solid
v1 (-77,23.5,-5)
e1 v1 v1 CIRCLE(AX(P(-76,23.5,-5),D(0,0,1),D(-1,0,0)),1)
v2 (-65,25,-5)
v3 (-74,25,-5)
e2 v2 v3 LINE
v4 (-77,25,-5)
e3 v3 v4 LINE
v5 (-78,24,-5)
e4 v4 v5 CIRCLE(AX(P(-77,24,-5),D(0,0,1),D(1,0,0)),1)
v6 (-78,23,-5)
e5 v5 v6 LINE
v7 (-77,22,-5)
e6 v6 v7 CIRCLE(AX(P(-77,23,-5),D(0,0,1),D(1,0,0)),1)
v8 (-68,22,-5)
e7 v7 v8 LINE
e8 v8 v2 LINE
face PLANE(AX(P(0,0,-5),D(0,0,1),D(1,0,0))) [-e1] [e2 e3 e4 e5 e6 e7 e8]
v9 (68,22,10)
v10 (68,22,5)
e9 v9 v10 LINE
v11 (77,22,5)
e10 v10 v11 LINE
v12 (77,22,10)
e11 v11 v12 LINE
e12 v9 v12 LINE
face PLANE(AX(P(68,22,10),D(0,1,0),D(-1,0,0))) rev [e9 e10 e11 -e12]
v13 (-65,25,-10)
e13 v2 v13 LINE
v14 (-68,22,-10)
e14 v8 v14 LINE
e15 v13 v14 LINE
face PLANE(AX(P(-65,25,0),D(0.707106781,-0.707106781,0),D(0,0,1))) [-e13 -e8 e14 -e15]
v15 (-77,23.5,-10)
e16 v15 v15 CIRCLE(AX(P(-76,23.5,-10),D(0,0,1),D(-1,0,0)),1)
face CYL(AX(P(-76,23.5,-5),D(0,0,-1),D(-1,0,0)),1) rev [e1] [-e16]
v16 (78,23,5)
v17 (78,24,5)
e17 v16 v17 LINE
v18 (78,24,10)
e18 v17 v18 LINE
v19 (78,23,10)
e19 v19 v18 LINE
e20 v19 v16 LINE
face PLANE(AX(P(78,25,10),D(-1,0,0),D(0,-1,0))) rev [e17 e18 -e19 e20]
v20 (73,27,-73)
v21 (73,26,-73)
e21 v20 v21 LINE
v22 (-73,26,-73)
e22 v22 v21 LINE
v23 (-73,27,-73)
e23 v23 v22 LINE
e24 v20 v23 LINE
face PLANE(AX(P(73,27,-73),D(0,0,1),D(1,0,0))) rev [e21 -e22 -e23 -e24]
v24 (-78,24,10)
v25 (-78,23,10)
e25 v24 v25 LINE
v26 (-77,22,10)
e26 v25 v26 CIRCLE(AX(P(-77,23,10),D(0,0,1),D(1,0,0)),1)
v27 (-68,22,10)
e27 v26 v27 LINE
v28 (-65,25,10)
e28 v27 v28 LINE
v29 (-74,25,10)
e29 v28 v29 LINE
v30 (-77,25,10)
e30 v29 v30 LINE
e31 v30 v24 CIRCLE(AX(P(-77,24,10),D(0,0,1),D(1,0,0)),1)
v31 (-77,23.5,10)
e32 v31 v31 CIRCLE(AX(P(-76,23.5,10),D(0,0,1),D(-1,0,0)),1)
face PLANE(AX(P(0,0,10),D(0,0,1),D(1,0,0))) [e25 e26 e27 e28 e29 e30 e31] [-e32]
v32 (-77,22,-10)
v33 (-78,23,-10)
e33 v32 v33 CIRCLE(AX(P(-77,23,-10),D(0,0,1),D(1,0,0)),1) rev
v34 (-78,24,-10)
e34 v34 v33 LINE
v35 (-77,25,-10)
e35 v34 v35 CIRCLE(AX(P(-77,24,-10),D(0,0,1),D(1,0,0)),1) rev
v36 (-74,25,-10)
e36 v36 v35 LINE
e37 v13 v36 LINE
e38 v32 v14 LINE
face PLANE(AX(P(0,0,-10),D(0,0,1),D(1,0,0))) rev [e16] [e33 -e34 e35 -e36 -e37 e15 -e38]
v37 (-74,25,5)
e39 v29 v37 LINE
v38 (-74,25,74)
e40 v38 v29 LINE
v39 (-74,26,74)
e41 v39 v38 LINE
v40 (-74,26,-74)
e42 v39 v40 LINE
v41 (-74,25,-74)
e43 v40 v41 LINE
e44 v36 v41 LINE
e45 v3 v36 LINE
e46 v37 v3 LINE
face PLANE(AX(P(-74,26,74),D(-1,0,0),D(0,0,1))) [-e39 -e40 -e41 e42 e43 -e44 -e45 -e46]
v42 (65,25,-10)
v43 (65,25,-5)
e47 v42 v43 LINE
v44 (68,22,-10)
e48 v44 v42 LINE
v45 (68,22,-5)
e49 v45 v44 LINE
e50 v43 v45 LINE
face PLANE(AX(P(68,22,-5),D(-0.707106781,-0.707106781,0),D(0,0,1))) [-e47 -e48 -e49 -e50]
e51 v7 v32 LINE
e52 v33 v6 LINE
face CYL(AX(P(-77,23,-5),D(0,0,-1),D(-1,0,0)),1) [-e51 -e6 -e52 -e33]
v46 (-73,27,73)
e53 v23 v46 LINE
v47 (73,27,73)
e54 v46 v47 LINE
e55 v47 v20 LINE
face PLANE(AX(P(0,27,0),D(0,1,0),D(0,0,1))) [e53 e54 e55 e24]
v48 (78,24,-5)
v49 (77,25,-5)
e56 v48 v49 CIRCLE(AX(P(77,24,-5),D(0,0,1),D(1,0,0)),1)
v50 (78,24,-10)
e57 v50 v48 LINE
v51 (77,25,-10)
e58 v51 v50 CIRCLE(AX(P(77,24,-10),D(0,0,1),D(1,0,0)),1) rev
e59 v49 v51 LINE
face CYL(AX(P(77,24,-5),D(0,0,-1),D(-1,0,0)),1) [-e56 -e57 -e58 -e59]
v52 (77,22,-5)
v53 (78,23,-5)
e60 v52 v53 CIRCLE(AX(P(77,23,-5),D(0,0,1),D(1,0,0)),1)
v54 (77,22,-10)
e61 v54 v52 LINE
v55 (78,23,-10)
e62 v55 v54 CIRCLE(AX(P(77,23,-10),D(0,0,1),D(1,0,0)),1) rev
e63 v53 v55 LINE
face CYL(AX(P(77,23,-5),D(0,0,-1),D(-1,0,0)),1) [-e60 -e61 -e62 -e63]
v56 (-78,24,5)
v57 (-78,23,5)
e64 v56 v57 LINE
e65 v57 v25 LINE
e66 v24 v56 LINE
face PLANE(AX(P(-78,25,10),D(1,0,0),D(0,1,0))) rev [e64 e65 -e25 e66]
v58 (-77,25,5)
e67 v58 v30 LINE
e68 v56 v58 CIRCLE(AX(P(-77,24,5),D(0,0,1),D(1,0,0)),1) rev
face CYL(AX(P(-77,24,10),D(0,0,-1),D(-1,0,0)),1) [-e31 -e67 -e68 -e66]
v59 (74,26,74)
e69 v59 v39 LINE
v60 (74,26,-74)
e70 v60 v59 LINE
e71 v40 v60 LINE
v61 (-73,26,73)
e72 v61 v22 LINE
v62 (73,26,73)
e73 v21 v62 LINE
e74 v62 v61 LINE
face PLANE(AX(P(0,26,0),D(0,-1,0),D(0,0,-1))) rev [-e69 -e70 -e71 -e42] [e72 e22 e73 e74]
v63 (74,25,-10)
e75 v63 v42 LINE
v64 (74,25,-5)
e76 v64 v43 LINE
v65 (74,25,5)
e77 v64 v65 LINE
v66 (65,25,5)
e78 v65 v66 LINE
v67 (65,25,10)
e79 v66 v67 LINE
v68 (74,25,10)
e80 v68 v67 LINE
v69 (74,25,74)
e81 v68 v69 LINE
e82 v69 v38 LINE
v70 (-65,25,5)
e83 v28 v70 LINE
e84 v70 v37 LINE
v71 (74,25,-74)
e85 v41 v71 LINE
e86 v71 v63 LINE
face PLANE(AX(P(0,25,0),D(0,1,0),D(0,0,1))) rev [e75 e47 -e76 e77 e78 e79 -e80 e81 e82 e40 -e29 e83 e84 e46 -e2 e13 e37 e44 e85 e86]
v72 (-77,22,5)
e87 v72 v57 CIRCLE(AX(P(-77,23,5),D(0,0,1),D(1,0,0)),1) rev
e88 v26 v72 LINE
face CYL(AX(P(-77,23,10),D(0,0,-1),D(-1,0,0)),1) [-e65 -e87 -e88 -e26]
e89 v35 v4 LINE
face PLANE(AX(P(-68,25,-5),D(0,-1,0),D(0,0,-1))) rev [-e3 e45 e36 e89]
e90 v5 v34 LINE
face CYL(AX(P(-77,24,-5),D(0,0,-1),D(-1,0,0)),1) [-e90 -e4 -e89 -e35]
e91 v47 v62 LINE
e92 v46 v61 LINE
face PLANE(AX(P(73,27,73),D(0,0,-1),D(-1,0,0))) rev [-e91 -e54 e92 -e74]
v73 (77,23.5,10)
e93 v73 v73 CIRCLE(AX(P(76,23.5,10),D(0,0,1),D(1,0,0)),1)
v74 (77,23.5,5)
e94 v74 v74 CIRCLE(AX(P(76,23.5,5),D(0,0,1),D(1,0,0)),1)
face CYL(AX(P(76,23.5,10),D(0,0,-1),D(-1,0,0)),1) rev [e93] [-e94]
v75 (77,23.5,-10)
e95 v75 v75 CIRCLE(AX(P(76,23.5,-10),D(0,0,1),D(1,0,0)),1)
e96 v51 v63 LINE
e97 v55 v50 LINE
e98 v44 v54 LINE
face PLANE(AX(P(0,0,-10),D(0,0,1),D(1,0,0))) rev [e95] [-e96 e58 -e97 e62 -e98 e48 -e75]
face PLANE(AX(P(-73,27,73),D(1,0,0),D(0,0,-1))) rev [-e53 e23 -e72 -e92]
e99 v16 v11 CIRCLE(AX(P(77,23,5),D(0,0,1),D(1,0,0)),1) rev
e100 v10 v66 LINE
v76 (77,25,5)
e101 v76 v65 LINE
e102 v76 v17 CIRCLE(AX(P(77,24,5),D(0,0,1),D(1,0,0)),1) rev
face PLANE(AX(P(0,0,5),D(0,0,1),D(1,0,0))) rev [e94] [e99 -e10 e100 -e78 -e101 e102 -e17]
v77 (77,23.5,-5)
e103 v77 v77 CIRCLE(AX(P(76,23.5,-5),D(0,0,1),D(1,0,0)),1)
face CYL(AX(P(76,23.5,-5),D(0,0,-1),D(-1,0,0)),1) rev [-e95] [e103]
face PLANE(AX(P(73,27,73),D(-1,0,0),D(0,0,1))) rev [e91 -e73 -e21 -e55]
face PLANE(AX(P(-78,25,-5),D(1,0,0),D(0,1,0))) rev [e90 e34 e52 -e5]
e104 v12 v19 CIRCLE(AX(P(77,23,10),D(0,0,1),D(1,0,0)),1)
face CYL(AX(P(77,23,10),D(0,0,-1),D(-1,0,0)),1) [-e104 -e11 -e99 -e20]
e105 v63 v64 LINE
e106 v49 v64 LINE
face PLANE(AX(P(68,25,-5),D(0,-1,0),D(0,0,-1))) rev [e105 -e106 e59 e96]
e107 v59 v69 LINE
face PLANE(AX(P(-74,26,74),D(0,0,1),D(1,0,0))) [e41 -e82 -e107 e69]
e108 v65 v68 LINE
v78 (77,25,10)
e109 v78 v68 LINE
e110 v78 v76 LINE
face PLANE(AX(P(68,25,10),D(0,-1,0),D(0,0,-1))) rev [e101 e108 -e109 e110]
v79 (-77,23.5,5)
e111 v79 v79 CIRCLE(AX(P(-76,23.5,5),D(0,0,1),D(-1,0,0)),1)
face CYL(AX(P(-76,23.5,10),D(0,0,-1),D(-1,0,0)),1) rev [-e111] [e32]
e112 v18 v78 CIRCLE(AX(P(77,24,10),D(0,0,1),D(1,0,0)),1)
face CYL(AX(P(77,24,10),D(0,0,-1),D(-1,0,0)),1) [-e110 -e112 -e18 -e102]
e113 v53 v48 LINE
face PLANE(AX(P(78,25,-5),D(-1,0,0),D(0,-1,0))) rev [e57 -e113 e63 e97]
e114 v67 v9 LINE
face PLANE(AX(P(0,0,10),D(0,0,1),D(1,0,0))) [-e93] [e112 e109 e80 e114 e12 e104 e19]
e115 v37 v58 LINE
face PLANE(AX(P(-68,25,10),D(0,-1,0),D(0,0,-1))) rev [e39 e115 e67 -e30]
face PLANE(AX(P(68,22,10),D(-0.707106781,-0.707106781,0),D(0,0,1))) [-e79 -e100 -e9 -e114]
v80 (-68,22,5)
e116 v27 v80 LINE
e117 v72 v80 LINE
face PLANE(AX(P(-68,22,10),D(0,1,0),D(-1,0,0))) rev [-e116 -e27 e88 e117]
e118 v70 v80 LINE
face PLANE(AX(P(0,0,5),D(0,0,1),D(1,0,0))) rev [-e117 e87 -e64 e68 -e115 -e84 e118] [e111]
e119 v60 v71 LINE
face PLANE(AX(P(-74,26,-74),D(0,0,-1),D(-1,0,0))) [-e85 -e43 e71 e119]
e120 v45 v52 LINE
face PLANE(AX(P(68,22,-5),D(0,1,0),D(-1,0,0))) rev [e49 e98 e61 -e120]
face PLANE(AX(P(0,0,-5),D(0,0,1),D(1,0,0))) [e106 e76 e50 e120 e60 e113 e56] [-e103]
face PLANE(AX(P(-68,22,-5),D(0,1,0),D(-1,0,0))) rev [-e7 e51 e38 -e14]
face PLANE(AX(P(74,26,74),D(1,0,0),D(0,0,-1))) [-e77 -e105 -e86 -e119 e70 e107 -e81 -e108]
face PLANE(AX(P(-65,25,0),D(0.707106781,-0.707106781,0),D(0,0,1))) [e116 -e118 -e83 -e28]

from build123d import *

# Parameters (mm, degrees)
SKETCH1_R           = 10
SKETCH1_R_2         = 7.5
BOSS_EXTRUDE1_DEPTH = 25
THREAD1_PITCH       = 0.3175
SKETCH4_W           = 146
SKETCH4_H           = 146
BOSS_EXTRUDE2_DEPTH = 2
SKETCH5_W           = 148
SKETCH5_H           = 148
BOSS_EXTRUDE3_DEPTH = 1
BOSS_EXTRUDE4_START = 7.5
SKETCH6_W           = 10
SKETCH6_H           = 3
SKETCH6_R           = 1
BOSS_EXTRUDE4_DEPTH = 2.5
BOSS_EXTRUDE5_START = -7.5
SKETCH6_2_W         = 10
SKETCH6_2_H         = 3
SKETCH6_2_R         = 1
BOSS_EXTRUDE5_DEPTH = 2.5
SKETCH9_R           = 18.995637602
CUT_EXTRUDE1_DEPTH  = 111.385687501
CHAMFER1_SIZE       = 3
FILLET1_R           = 1


with BuildPart() as part:
    # Sketch1 → Boss-Extrude1 (new body)
    with BuildSketch(Plane(origin=(0, 0, 0), x_dir=(1, 0, 0), z_dir=(0, 1, 0))):
        with Locations(Location((0, 0, 0), (0, 0, 270))):
            Circle(SKETCH1_R)
        with Locations(Location((0, 0, 0), (0, 0, 270))):
            Circle(SKETCH1_R_2, mode=Mode.SUBTRACT)
    extrude(amount=BOSS_EXTRUDE1_DEPTH)

    # Thread1: the profile of Thread Profile1 profile screwed along a right-hand helix of 18.897638 turns, 6 arcs to a turn; built about Z, then put on its axis
    thread1_z = Axis((0, 0, 0), (0, 0, 1))
    thread1_corners = [(10.0003, 0, -0.000173205), (10.0003, 0, 0.277985704), (9.828148085, 0, 0.17859375), (9.828148085, 0, 0.09921875)]
    with BuildLine(mode=Mode.PRIVATE) as thread1_profile:
        Line(thread1_corners[0], thread1_corners[1])
        Line(thread1_corners[1], thread1_corners[2])
        Line(thread1_corners[2], thread1_corners[3])
        Line(thread1_corners[3], thread1_corners[0])
    thread1_cap = Face(thread1_profile.wire())
    thread1_turn_angles = [0, 30, 60, 90, 120, 150, 180, 210, 240, 270, 300, 330, 360]
    thread1_turn_weights = [1, 0.8660254037844387, 1, 0.8660254037844387, 1, 0.8660254037844387, 1, 0.8660254037844387, 1, 0.8660254037844387, 1, 0.8660254037844387, 1]
    thread1_turn_rails = [Edge.make_bspline([Vector(p[0], p[1], 0).rotate(thread1_z, thread1_turn_angles[k]) / thread1_turn_weights[k] + Vector(0, 0, p[2] + THREAD1_PITCH * thread1_turn_angles[k] / 360) for k in range(13)], [0, 0, 0, 1, 1, 2, 2, 3, 3, 4, 4, 5, 5, 6, 6, 6], 2, thread1_turn_weights) for p in thread1_corners]
    thread1_turn_sides = [Face.make_surface_from_curves(thread1_turn_rails[p[0]], thread1_turn_rails[p[1]]) for p in [(0, 1), (1, 2), (2, 3), (3, 0)]]
    thread1_last_angles = [6480, 6510, 6540, 6570, 6600, 6630, 6660, 6690, 6720, 6750, 6780, 6791.57480315, 6803.149606299]
    thread1_last_weights = [1, 0.8660254037844387, 1, 0.8660254037844387, 1, 0.8660254037844387, 1, 0.8660254037844387, 1, 0.8660254037844387, 1, 0.9796635825089068, 1]
    thread1_last_rails = [Edge.make_bspline([Vector(p[0], p[1], 0).rotate(thread1_z, thread1_last_angles[k]) / thread1_last_weights[k] + Vector(0, 0, p[2] + THREAD1_PITCH * thread1_last_angles[k] / 360) for k in range(13)], [0, 0, 0, 1, 1, 2, 2, 3, 3, 4, 4, 5, 5, 6, 6, 6], 2, thread1_last_weights) for p in thread1_corners]
    thread1_last_sides = [Face.make_surface_from_curves(thread1_last_rails[p[0]], thread1_last_rails[p[1]]) for p in [(0, 1), (1, 2), (2, 3), (3, 0)]]
    thread1 = Plane(origin=(0, -0.5, 0), x_dir=(1, 0, 0), z_dir=(0, 1, 0)) * Solid(Shell([*[p.moved(Location((0, 0, THREAD1_PITCH * i))) for i in range(18) for p in thread1_turn_sides], *thread1_last_sides, thread1_cap, thread1_cap.rotate(thread1_z, 6803.149606299).moved(Location((0, 0, THREAD1_PITCH * 6803.149606299 / 360)))]))
    add(thread1, mode=Mode.SUBTRACT)

    # Sketch4 → Boss-Extrude2 (add)
    with BuildSketch(Plane(origin=(0, 25, 0), x_dir=(1, 0, 0), z_dir=(0, 1, 0))):
        Rectangle(SKETCH4_W, SKETCH4_H)
    extrude(amount=BOSS_EXTRUDE2_DEPTH)

    # Sketch5 → Boss-Extrude3 (add)
    with BuildSketch(Plane.XZ.offset(-25)):
        Rectangle(SKETCH5_W, SKETCH5_H)
    extrude(amount=-BOSS_EXTRUDE3_DEPTH)

    # Sketch6 → Boss-Extrude4 (add, symmetric)
    # profile 1 of 2: a face of its own
    with BuildSketch(Plane.XY.offset(BOSS_EXTRUDE4_START)):
        with Locations((73, 23.5)):
            Rectangle(SKETCH6_W, SKETCH6_H)
        with Locations((76, 23.5)):
            Circle(SKETCH6_R, mode=Mode.SUBTRACT)
    # profile 2 of 2: a face of its own
    with BuildSketch(Plane.XY.offset(BOSS_EXTRUDE4_START)):
        with Locations((-73, 23.5)):
            Rectangle(SKETCH6_W, SKETCH6_H)
        with Locations(Location((-76, 23.5, 0), (0, 0, 180))):
            Circle(SKETCH6_R, mode=Mode.SUBTRACT)
    extrude(amount=BOSS_EXTRUDE4_DEPTH, both=True)

    # Sketch6<2> → Boss-Extrude5 (add, symmetric)
    # profile 1 of 2: a face of its own
    with BuildSketch(Plane.XY.offset(BOSS_EXTRUDE5_START)):
        with Locations((73, 23.5)):
            Rectangle(SKETCH6_2_W, SKETCH6_2_H)
        with Locations((76, 23.5)):
            Circle(SKETCH6_2_R, mode=Mode.SUBTRACT)
    # profile 2 of 2: a face of its own
    with BuildSketch(Plane.XY.offset(BOSS_EXTRUDE5_START)):
        with Locations((-73, 23.5)):
            Rectangle(SKETCH6_2_W, SKETCH6_2_H)
        with Locations(Location((-76, 23.5, 0), (0, 0, 180))):
            Circle(SKETCH6_2_R, mode=Mode.SUBTRACT)
    extrude(amount=BOSS_EXTRUDE5_DEPTH, both=True)

    # Sketch9 → Cut-Extrude1 (cut, through all)
    with BuildSketch(Plane.XZ.offset(-25)):
        Circle(SKETCH9_R)
    extrude(amount=CUT_EXTRUDE1_DEPTH, mode=Mode.SUBTRACT)

    # Chamfer1
    chamfer1_edges = [part.edges().sort_by_distance(p)[0] for p in [
        (68, 25, -7.5),
        (68, 25, 7.5),
        (-68, 25, -7.5),
        (-68, 25, 7.5),
    ]]
    chamfer(chamfer1_edges, length=CHAMFER1_SIZE - 0.0001)  # a hair under: the kernel refuses the full size

    # Fillet1
    fillet1_edges = [part.edges().sort_by_distance(p)[0] for p in [
        (78, 22, -7.5),
        (78, 25, -7.5),
        (-78, 25, -7.5),
        (-78, 22, -7.5),
        (78, 22, 7.5),
        (78, 25, 7.5),
        (-78, 25, 7.5),
        (-78, 22, 7.5),
    ]]
    fillet(fillet1_edges, radius=FILLET1_R)


solid = part.part
